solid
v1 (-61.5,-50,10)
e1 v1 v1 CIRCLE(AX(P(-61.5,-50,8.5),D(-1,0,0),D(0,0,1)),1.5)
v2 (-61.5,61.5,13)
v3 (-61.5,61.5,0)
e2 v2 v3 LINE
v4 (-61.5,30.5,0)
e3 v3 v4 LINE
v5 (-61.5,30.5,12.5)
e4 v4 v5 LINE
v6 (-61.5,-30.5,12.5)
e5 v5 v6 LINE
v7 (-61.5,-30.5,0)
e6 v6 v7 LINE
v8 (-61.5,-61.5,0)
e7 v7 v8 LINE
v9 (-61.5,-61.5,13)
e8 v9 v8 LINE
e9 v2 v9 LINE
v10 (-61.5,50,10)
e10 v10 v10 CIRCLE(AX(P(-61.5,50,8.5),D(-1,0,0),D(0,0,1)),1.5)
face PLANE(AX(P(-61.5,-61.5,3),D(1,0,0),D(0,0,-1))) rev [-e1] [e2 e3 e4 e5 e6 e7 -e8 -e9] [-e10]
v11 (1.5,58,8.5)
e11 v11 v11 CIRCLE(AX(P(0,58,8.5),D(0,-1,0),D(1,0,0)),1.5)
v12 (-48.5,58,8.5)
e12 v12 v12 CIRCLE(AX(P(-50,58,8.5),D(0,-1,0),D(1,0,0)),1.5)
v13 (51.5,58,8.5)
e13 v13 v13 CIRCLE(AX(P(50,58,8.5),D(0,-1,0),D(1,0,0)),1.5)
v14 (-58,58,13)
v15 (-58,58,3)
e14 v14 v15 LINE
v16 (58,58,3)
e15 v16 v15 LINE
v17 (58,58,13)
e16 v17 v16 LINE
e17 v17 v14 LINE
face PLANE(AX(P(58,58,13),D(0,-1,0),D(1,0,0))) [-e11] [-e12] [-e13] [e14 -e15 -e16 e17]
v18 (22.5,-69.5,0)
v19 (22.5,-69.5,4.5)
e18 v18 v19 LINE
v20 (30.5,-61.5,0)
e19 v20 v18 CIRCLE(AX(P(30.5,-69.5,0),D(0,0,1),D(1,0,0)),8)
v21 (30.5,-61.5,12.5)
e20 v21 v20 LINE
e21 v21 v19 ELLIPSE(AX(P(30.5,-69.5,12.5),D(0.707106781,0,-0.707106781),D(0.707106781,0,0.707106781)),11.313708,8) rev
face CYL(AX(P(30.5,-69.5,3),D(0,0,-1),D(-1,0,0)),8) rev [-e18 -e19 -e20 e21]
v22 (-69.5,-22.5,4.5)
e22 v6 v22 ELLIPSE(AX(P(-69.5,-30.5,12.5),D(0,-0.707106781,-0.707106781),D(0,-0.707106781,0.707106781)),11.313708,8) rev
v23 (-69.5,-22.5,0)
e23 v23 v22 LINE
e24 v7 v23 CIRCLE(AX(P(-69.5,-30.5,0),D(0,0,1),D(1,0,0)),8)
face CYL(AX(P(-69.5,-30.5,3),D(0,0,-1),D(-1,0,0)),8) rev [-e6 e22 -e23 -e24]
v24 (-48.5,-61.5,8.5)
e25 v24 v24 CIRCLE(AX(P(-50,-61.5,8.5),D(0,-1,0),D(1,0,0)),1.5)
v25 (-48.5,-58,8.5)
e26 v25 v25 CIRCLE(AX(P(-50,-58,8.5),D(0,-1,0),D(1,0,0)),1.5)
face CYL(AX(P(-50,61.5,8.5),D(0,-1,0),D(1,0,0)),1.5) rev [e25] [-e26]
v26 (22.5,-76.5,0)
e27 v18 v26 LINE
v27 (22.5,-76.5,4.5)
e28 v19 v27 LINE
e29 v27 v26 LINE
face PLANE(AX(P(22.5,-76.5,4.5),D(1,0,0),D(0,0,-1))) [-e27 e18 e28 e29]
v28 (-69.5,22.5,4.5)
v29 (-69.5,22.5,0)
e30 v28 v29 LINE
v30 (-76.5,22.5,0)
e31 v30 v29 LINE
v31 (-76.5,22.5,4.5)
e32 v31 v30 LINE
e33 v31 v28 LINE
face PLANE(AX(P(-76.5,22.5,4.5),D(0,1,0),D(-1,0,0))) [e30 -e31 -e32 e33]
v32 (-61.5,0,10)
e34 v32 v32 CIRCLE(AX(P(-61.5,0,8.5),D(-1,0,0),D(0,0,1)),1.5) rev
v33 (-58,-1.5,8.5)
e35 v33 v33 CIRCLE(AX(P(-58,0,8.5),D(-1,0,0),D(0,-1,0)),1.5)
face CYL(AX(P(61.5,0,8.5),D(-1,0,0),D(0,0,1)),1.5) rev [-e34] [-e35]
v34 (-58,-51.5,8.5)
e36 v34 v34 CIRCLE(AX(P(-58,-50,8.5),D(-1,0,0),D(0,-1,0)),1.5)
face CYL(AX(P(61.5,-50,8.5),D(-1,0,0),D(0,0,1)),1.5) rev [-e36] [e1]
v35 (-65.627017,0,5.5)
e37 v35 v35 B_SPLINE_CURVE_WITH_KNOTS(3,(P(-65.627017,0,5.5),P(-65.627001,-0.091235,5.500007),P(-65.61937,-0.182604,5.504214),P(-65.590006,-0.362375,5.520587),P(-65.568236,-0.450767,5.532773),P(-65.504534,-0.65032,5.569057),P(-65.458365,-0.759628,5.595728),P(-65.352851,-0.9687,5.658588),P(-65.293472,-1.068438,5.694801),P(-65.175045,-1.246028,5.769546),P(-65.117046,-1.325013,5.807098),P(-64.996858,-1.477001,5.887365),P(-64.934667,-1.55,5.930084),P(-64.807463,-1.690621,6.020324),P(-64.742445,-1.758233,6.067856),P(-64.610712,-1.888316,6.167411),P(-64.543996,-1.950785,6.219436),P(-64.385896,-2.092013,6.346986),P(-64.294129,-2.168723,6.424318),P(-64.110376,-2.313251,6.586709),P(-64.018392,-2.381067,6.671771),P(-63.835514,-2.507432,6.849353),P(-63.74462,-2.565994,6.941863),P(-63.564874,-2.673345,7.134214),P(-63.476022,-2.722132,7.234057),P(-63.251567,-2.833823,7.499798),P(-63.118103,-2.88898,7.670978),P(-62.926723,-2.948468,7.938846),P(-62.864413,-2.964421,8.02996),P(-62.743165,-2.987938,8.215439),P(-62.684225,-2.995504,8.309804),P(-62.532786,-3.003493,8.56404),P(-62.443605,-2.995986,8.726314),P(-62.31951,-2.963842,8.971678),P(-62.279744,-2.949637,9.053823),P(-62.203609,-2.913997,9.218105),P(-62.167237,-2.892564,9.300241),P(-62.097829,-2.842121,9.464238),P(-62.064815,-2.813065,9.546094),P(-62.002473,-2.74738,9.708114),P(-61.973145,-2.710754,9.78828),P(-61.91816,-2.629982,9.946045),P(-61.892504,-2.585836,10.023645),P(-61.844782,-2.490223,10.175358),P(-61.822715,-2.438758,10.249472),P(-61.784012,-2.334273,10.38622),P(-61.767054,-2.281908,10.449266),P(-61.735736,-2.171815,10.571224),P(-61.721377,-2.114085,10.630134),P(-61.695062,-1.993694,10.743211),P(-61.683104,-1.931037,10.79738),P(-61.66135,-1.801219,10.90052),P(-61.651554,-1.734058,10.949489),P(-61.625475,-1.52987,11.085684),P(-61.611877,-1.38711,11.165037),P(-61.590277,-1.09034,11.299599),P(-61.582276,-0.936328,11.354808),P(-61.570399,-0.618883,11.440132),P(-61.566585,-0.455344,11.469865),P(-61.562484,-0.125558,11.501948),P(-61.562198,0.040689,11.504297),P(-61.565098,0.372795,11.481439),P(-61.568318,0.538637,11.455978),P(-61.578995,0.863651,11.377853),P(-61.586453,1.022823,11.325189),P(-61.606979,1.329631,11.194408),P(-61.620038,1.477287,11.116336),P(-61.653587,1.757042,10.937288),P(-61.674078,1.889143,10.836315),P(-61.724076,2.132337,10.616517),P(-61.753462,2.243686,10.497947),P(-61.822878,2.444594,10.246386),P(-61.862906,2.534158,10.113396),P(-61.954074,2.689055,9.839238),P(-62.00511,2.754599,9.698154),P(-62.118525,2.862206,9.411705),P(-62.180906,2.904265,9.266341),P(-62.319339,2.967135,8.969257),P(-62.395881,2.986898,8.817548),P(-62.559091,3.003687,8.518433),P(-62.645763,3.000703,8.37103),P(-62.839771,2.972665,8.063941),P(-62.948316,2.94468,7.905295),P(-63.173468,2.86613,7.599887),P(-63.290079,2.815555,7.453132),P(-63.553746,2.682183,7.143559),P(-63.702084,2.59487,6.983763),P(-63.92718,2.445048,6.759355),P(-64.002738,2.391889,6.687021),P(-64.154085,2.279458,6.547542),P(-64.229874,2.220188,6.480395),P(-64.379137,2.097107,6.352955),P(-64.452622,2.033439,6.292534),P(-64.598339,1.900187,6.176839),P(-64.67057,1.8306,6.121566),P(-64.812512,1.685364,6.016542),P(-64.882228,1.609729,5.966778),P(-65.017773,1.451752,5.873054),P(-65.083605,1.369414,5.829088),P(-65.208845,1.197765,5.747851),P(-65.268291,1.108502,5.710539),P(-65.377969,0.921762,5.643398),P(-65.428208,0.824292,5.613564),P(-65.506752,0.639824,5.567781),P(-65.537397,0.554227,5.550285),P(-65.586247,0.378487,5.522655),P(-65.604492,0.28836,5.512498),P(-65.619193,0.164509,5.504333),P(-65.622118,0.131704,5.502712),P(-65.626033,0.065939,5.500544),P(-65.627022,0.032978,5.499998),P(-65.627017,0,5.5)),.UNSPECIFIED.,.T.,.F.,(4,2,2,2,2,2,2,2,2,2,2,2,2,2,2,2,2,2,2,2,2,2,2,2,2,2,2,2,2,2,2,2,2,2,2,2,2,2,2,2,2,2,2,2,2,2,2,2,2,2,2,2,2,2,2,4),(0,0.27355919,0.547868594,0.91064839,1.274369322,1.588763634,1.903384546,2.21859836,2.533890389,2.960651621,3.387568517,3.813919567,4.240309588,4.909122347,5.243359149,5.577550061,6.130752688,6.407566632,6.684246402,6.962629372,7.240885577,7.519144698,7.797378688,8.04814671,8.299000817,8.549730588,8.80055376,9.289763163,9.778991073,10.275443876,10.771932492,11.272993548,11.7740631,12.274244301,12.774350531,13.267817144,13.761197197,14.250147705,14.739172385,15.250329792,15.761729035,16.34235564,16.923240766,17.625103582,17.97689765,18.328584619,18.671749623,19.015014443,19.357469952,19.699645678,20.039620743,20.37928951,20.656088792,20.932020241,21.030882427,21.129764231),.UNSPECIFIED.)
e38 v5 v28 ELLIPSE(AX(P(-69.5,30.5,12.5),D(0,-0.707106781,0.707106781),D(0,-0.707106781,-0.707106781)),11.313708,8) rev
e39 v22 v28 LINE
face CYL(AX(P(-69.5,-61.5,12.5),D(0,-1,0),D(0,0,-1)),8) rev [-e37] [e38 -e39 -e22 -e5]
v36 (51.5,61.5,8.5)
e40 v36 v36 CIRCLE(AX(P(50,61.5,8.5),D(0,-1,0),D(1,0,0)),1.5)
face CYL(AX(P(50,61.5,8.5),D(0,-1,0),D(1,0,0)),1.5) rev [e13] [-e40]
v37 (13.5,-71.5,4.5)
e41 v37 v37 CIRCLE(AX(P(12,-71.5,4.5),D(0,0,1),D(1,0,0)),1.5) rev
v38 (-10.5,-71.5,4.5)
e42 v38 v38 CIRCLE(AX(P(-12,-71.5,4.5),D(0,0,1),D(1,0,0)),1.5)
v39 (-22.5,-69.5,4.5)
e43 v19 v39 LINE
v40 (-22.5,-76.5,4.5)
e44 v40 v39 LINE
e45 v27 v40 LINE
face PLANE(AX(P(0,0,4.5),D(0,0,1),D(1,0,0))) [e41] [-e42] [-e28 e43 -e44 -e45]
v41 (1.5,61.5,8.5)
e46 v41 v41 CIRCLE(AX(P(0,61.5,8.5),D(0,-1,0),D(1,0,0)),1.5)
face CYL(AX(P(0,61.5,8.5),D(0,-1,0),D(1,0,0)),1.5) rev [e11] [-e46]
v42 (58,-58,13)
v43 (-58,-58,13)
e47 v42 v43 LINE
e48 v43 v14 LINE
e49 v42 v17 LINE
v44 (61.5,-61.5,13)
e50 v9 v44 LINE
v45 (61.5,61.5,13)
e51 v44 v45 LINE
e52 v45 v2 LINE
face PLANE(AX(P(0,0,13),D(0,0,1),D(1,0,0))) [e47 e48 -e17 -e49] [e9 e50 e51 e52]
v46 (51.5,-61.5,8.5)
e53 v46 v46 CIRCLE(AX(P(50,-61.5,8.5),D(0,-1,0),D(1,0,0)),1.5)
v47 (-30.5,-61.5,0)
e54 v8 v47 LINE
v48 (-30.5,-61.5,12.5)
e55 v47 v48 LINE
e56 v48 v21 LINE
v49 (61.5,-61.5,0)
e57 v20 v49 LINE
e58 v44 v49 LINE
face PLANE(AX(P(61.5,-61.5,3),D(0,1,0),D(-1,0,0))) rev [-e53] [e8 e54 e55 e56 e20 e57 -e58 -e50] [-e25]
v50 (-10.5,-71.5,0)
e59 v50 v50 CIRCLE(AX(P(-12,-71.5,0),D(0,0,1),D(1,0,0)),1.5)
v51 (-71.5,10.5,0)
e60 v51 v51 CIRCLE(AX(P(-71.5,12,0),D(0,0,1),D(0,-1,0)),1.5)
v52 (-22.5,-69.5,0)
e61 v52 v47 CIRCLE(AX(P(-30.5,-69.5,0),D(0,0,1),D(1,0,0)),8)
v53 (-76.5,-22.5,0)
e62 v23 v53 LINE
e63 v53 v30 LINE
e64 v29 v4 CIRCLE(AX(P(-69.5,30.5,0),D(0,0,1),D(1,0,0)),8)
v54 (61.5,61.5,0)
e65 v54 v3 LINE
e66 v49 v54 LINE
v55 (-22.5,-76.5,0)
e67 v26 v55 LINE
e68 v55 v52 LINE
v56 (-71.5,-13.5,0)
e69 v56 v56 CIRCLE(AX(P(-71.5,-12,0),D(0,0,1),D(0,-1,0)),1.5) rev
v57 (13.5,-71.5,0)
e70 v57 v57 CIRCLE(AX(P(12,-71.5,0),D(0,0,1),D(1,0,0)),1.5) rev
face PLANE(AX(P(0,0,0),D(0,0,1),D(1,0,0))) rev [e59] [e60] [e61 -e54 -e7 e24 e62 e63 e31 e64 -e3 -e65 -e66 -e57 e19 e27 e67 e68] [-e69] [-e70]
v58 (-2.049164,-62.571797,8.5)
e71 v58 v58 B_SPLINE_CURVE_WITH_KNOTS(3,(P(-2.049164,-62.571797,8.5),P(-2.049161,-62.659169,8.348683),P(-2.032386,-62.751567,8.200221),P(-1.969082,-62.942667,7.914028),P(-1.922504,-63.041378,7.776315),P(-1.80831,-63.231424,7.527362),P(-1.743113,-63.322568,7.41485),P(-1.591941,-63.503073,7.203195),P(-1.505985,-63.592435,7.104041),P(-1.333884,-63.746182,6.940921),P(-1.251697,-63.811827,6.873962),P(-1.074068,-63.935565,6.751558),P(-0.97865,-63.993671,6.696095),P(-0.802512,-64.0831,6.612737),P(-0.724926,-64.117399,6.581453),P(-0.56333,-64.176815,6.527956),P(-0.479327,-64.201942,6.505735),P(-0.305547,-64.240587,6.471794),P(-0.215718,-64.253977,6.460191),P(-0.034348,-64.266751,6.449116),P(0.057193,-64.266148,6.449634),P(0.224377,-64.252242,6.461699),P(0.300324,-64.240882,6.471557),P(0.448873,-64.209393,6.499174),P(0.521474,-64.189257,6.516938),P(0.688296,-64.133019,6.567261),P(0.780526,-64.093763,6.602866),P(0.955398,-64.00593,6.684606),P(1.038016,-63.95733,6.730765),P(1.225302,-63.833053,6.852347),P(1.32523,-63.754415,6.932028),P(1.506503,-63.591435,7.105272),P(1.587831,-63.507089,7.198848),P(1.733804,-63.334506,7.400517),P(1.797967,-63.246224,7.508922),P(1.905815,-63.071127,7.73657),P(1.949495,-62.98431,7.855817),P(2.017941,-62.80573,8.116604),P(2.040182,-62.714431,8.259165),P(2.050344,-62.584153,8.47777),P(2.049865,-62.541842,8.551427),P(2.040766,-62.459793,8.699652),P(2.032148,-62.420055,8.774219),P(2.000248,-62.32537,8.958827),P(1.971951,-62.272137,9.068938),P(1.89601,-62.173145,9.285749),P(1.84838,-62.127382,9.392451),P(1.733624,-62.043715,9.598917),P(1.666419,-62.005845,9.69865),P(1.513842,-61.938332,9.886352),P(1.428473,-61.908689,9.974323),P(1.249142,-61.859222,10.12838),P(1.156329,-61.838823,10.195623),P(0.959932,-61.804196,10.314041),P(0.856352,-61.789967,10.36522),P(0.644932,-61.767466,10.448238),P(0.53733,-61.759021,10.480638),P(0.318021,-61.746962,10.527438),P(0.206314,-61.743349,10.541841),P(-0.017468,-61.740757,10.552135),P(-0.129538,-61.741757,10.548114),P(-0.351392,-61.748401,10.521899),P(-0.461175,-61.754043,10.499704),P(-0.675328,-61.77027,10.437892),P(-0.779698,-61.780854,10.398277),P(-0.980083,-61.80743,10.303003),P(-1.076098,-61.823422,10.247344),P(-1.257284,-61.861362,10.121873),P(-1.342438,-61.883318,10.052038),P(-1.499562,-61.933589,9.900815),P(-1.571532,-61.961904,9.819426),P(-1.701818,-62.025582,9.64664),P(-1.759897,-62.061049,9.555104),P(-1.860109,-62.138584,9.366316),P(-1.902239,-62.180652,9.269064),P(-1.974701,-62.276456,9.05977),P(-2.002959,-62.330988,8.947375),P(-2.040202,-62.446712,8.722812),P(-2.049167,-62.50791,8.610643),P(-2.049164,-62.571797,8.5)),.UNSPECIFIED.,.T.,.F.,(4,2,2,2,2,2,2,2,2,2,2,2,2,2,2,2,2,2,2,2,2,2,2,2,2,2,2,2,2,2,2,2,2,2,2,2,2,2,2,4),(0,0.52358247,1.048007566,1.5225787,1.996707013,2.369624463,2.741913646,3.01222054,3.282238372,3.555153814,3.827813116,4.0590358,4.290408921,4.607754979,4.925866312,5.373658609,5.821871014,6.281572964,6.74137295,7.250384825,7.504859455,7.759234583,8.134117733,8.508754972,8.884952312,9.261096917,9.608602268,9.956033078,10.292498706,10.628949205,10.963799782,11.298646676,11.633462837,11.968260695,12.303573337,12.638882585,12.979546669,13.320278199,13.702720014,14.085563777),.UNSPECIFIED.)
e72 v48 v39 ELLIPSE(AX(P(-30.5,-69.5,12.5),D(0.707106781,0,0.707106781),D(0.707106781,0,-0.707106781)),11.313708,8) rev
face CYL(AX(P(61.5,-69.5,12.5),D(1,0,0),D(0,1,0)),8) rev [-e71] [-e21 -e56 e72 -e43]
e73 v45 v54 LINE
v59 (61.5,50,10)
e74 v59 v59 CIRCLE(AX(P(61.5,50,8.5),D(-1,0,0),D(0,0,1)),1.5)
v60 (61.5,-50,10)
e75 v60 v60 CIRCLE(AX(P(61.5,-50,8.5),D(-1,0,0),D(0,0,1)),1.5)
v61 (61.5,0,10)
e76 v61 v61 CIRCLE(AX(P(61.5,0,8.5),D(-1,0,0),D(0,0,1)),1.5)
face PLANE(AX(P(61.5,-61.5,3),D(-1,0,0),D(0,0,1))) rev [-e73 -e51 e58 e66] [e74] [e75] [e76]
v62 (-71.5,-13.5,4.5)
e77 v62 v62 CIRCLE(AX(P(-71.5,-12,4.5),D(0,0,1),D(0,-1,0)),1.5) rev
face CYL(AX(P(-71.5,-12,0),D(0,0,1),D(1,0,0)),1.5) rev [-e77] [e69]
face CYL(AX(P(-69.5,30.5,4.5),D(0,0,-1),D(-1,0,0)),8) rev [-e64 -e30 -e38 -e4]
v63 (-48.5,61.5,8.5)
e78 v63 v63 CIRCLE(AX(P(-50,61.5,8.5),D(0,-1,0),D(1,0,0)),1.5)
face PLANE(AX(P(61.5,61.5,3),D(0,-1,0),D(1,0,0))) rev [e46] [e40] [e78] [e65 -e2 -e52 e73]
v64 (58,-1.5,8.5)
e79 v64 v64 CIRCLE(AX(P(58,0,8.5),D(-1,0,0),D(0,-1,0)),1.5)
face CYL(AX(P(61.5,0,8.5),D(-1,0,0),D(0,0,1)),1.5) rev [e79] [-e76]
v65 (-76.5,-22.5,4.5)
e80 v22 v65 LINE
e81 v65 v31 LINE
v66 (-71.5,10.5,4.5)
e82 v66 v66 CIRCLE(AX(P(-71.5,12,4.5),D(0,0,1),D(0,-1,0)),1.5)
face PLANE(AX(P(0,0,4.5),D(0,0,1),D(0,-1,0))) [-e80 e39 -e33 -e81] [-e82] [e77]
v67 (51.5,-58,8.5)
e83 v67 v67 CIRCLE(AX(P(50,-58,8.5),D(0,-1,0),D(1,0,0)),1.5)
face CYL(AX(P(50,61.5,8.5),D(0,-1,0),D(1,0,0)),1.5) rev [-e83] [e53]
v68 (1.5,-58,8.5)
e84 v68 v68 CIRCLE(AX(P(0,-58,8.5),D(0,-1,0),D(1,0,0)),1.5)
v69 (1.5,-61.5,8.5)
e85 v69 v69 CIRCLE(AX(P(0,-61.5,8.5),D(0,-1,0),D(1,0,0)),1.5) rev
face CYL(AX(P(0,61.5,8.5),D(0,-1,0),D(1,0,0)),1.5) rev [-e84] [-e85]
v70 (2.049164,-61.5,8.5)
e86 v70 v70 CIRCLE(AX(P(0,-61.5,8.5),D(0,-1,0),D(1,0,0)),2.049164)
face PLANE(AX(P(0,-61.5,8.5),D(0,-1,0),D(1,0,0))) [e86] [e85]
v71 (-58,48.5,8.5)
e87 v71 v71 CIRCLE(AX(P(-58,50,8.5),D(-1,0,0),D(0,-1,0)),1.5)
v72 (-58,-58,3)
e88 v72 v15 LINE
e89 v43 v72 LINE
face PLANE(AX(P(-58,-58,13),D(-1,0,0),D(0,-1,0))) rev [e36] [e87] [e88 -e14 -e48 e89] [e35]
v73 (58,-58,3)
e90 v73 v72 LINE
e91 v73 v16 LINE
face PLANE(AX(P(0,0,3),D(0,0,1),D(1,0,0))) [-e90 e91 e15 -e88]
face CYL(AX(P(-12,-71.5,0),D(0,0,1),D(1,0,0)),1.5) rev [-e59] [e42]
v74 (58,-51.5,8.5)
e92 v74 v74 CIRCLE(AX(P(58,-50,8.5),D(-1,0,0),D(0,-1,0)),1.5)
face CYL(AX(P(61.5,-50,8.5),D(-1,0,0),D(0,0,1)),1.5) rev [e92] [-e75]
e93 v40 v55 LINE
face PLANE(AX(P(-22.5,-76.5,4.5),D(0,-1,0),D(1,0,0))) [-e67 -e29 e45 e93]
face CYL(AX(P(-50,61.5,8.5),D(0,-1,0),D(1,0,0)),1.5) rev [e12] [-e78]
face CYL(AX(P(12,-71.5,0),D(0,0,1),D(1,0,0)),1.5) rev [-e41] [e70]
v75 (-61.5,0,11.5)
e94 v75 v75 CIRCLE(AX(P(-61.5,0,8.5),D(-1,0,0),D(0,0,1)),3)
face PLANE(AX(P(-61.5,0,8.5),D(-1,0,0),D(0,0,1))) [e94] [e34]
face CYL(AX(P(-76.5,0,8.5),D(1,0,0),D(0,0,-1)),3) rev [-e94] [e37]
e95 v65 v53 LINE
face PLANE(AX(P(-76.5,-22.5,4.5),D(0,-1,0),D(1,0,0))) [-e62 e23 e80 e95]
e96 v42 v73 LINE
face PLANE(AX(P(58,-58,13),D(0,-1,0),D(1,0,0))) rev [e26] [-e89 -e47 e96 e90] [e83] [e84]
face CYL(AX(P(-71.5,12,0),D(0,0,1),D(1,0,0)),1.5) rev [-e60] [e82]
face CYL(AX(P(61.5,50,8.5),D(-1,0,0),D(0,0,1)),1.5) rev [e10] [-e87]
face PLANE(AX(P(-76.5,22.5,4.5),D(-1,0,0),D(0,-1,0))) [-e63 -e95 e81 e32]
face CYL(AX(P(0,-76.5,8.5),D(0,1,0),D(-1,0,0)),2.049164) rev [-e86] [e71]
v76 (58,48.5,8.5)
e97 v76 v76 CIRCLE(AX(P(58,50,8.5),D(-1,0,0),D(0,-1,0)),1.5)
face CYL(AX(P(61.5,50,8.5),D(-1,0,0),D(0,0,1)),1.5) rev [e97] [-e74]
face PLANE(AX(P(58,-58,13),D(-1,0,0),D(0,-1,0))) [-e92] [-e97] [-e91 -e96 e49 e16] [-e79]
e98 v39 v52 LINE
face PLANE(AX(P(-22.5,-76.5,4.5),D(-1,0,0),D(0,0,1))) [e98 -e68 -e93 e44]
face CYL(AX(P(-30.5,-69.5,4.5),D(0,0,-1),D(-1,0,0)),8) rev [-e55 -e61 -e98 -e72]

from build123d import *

# Parameters (mm, degrees)
SKETCH_3_W               = 123
SKETCH_3_H               = 123
EXTRUDE_2_DEPTH          = 3
SKETCH_4_W               = 123
SKETCH_4_H               = 123
SKETCH_4_W_2             = 116
SKETCH_4_H_2             = 116
EXTRUDE_3_DEPTH          = 10
SKETCH_7_R               = 1.5
CUT_EXTRUDE_1_DEPTH      = 139.131278138
SKETCH_9_R               = 1.5
CUT_EXTRUDE_2_DEPTH      = 139.131278138
SKETCH_10_W              = 45
SKETCH_10_H              = 15
EXTRUDE_4_DEPTH          = 4.5
SKETCH_11_R              = 1.5
CUT_EXTRUDE_3_DEPTH      = 99.522839992
PATTERN_CIRCULAR_1_COUNT = 2
PATTERN_CIRCULAR_1_ANGLE = 90
FILLET_1_R               = 8
SKETCH_13_R              = 3
CUT_EXTRUDE_4_DEPTH      = 146.431255238
SKETCH_14_R              = 2.049164466
CUT_EXTRUDE_6_DEPTH      = 146.431255238


with BuildPart() as part:
    # 草图3 → 凸台-拉伸2 (new body)
    with BuildSketch(Plane.XY):
        Rectangle(SKETCH_3_W, SKETCH_3_H)
    extrude(amount=EXTRUDE_2_DEPTH)

    # 草图4 → 凸台-拉伸3 (add)
    with BuildSketch(Plane.XY.offset(3)):
        Rectangle(SKETCH_4_W, SKETCH_4_H)
        Rectangle(SKETCH_4_W_2, SKETCH_4_H_2, mode=Mode.SUBTRACT)
    extrude(amount=EXTRUDE_3_DEPTH)

    # 草图7 → 切除-拉伸1 (cut, through all)
    with BuildSketch(Plane.XZ.offset(61.5)):
        with Locations((0, 8.5)):
            Circle(SKETCH_7_R)
        with Locations((50, 8.5)):
            Circle(SKETCH_7_R)
        with Locations((-50, 8.5)):
            Circle(SKETCH_7_R)
    extrude(amount=-CUT_EXTRUDE_1_DEPTH, mode=Mode.SUBTRACT)

    # 草图9 → 切除-拉伸2 (cut, through all)
    with BuildSketch(Plane.ZY.offset(61.5)):
        with Locations((8.5, 0)):
            Circle(SKETCH_9_R)
        with Locations((8.5, -50)):
            Circle(SKETCH_9_R)
        with Locations((8.5, 50)):
            Circle(SKETCH_9_R)
    extrude(amount=-CUT_EXTRUDE_2_DEPTH, mode=Mode.SUBTRACT)

    # 草图10 → 凸台-拉伸4 (add)
    with BuildSketch(Plane(origin=(0, 0, 0), x_dir=(-1, 0, 0), z_dir=(0, 0, -1))):
        with Locations((0, -69)):
            Rectangle(SKETCH_10_W, SKETCH_10_H)
    extrude_4 = extrude(amount=-EXTRUDE_4_DEPTH)

    # 草图11 → 切除-拉伸3 (cut, through all)
    with BuildSketch(Plane.XY.offset(4.5)):
        with Locations((-12, -71.5)):
            Circle(SKETCH_11_R)
        with Locations((12, -71.5)):
            Circle(SKETCH_11_R)
    cut_extrude_3 = extrude(amount=-CUT_EXTRUDE_3_DEPTH, mode=Mode.SUBTRACT)

    # 阵列(圆周)1: 凸台-拉伸4, 切除-拉伸3 ×2 about axis
    pattern_circular_1_axis = Axis((0, 0, 0), (0, 0, -1))
    add([extrude_4.rotate(pattern_circular_1_axis, i * PATTERN_CIRCULAR_1_ANGLE / (PATTERN_CIRCULAR_1_COUNT - 1)) for i in range(1, PATTERN_CIRCULAR_1_COUNT)])
    add([cut_extrude_3.rotate(pattern_circular_1_axis, i * PATTERN_CIRCULAR_1_ANGLE / (PATTERN_CIRCULAR_1_COUNT - 1)) for i in range(1, PATTERN_CIRCULAR_1_COUNT)], mode=Mode.SUBTRACT)

    # 圆角1
    # the kernel refuses this fillet: 8 mm, written as the material it adds along each edge
    with BuildSketch(Plane(origin=(-61.5, 22.5, 0), x_dir=(0, 1, 0), z_dir=(0, 0, 1)), Plane(origin=(-22.5, -61.5, 0), x_dir=(-1, 0, 0), z_dir=(0, 0, 1))) as fillet_1_piece_1:
        with BuildLine():
            CenterArc((FILLET_1_R, FILLET_1_R), FILLET_1_R, 180, 90)
            Line((0, FILLET_1_R), (0, 0))
            Line((0, 0), (FILLET_1_R, 0))
        make_face()
    extrude(amount=4.5)
    with BuildSketch(Plane(origin=(-61.5, -22.5, 4.5), x_dir=(0, 0, 1), z_dir=(0, 1, 0))) as fillet_1_piece_2_section:
        with BuildLine():
            CenterArc((FILLET_1_R, -FILLET_1_R), FILLET_1_R, 90, 90)
            Line((0, -FILLET_1_R), (0, 0))
            Line((0, 0), (FILLET_1_R, 0))
        make_face()
    fillet_1_piece_2 = extrude(amount=45, mode=Mode.PRIVATE)
    fillet_1_piece_2 = fillet_1_piece_2 - Plane(origin=(-63.326853287, 0, 8.5), x_dir=(0, 0, 1), z_dir=(-1, 0, 0)) * Cylinder(1.5, 122, mode=Mode.PRIVATE)
    add(fillet_1_piece_2)
    with BuildSketch(Plane(origin=(-61.5, -22.5, 0), x_dir=(0, -1, 0), z_dir=(0, 0, 1)), Plane(origin=(22.5, -61.5, 0), x_dir=(1, 0, 0), z_dir=(0, 0, 1))) as fillet_1_piece_3:
        with BuildLine():
            CenterArc((FILLET_1_R, -FILLET_1_R), FILLET_1_R, 90, 90)
            Line((0, -FILLET_1_R), (0, 0))
            Line((0, 0), (FILLET_1_R, 0))
        make_face()
    extrude(amount=4.5)
    with BuildSketch(Plane(origin=(22.5, -61.5, 4.5), x_dir=(0, 0, 1), z_dir=(-1, 0, 0))) as fillet_1_piece_4_section:
        with BuildLine():
            CenterArc((FILLET_1_R, -FILLET_1_R), FILLET_1_R, 90, 90)
            Line((0, -FILLET_1_R), (0, 0))
            Line((0, 0), (FILLET_1_R, 0))
        make_face()
    fillet_1_piece_4 = extrude(amount=45, mode=Mode.PRIVATE)
    fillet_1_piece_4 = fillet_1_piece_4 - Plane(origin=(0, -63.326852549, 8.5), x_dir=(1, 0, 0), z_dir=(0, -1, 0)) * Cylinder(1.5, 122, mode=Mode.PRIVATE)
    add(fillet_1_piece_4)
    with BuildSketch(Plane(origin=(-61.5, -22.5, 4.5), x_dir=(0, 0, 1), z_dir=(0, 1, 0))) as fillet_1_piece_5a_section:
        with BuildLine():
            CenterArc((FILLET_1_R, -FILLET_1_R), FILLET_1_R, 90, 90)
            Line((0, -FILLET_1_R), (0, 0))
            Line((0, 0), (FILLET_1_R, 0))
        make_face()
    fillet_1_piece_5a = extrude(amount=65, mode=Mode.PRIVATE)
    fillet_1_piece_5a = split(fillet_1_piece_5a, bisect_by=Plane(origin=(-63.311160914, 22.5, 6.311160914), z_dir=(0, 1, 0)), keep=Keep.TOP, mode=Mode.PRIVATE)
    with BuildSketch(Plane(origin=(-61.5, 22.5, 0), x_dir=(0, 1, 0), z_dir=(0, 0, 1))) as fillet_1_piece_5b_section:
        with BuildLine():
            CenterArc((FILLET_1_R, FILLET_1_R), FILLET_1_R, 180, 90)
            Line((0, FILLET_1_R), (0, 0))
            Line((0, 0), (FILLET_1_R, 0))
        make_face()
    fillet_1_piece_5b = extrude(amount=24.5, mode=Mode.PRIVATE)
    fillet_1_piece_5b = split(fillet_1_piece_5b, bisect_by=Plane(origin=(-63.311160914, 24.311160914, 13), z_dir=(0, 0, -1)), keep=Keep.TOP, mode=Mode.PRIVATE)
    fillet_1_piece_5b = split(fillet_1_piece_5b, bisect_by=Plane(origin=(-63.311160914, 24.311160914, 4.5), z_dir=(0, 0, 1)), keep=Keep.TOP, mode=Mode.PRIVATE)
    fillet_1_piece_5 = fillet_1_piece_5a & fillet_1_piece_5b
    add(fillet_1_piece_5)
    with BuildSketch(Plane(origin=(-61.5, -22.5, 0), x_dir=(0, -1, 0), z_dir=(0, 0, 1))) as fillet_1_piece_6a_section:
        with BuildLine():
            CenterArc((FILLET_1_R, -FILLET_1_R), FILLET_1_R, 90, 90)
            Line((0, -FILLET_1_R), (0, 0))
            Line((0, 0), (FILLET_1_R, 0))
        make_face()
    fillet_1_piece_6a = extrude(amount=24.5, mode=Mode.PRIVATE)
    fillet_1_piece_6a = split(fillet_1_piece_6a, bisect_by=Plane(origin=(-63.311160914, -24.311160914, 13), z_dir=(0, 0, -1)), keep=Keep.TOP, mode=Mode.PRIVATE)
    fillet_1_piece_6a = split(fillet_1_piece_6a, bisect_by=Plane(origin=(-63.311160914, -24.311160914, 4.5), z_dir=(0, 0, 1)), keep=Keep.TOP, mode=Mode.PRIVATE)
    with BuildSketch(Plane(origin=(-61.5, -42.5, 4.5), x_dir=(0, 0, 1), z_dir=(0, 1, 0))) as fillet_1_piece_6b_section:
        with BuildLine():
            CenterArc((FILLET_1_R, -FILLET_1_R), FILLET_1_R, 90, 90)
            Line((0, -FILLET_1_R), (0, 0))
            Line((0, 0), (FILLET_1_R, 0))
        make_face()
    fillet_1_piece_6b = extrude(amount=65, mode=Mode.PRIVATE)
    fillet_1_piece_6b = split(fillet_1_piece_6b, bisect_by=Plane(origin=(-63.311160914, -22.5, 6.311160914), z_dir=(0, -1, 0)), keep=Keep.TOP, mode=Mode.PRIVATE)
    fillet_1_piece_6 = fillet_1_piece_6a & fillet_1_piece_6b
    add(fillet_1_piece_6)
    with BuildSketch(Plane(origin=(22.5, -61.5, 4.5), x_dir=(0, 0, 1), z_dir=(-1, 0, 0))) as fillet_1_piece_7a_section:
        with BuildLine():
            CenterArc((FILLET_1_R, -FILLET_1_R), FILLET_1_R, 90, 90)
            Line((0, -FILLET_1_R), (0, 0))
            Line((0, 0), (FILLET_1_R, 0))
        make_face()
    fillet_1_piece_7a = extrude(amount=65, mode=Mode.PRIVATE)
    fillet_1_piece_7a = split(fillet_1_piece_7a, bisect_by=Plane(origin=(-22.5, -63.311160914, 6.311160914), z_dir=(-1, 0, 0)), keep=Keep.TOP, mode=Mode.PRIVATE)
    with BuildSketch(Plane(origin=(-22.5, -61.5, 0), x_dir=(-1, 0, 0), z_dir=(0, 0, 1))) as fillet_1_piece_7b_section:
        with BuildLine():
            CenterArc((FILLET_1_R, FILLET_1_R), FILLET_1_R, 180, 90)
            Line((0, FILLET_1_R), (0, 0))
            Line((0, 0), (FILLET_1_R, 0))
        make_face()
    fillet_1_piece_7b = extrude(amount=24.5, mode=Mode.PRIVATE)
    fillet_1_piece_7b = split(fillet_1_piece_7b, bisect_by=Plane(origin=(-24.311160914, -63.311160914, 13), z_dir=(0, 0, -1)), keep=Keep.TOP, mode=Mode.PRIVATE)
    fillet_1_piece_7b = split(fillet_1_piece_7b, bisect_by=Plane(origin=(-24.311160914, -63.311160914, 4.5), z_dir=(0, 0, 1)), keep=Keep.TOP, mode=Mode.PRIVATE)
    fillet_1_piece_7 = fillet_1_piece_7a & fillet_1_piece_7b
    add(fillet_1_piece_7)
    with BuildSketch(Plane(origin=(22.5, -61.5, 0), x_dir=(1, 0, 0), z_dir=(0, 0, 1))) as fillet_1_piece_8a_section:
        with BuildLine():
            CenterArc((FILLET_1_R, -FILLET_1_R), FILLET_1_R, 90, 90)
            Line((0, -FILLET_1_R), (0, 0))
            Line((0, 0), (FILLET_1_R, 0))
        make_face()
    fillet_1_piece_8a = extrude(amount=24.5, mode=Mode.PRIVATE)
    fillet_1_piece_8a = split(fillet_1_piece_8a, bisect_by=Plane(origin=(24.311160914, -63.311160914, 13), z_dir=(0, 0, -1)), keep=Keep.TOP, mode=Mode.PRIVATE)
    fillet_1_piece_8a = split(fillet_1_piece_8a, bisect_by=Plane(origin=(24.311160914, -63.311160914, 4.5), z_dir=(0, 0, 1)), keep=Keep.TOP, mode=Mode.PRIVATE)
    with BuildSketch(Plane(origin=(42.5, -61.5, 4.5), x_dir=(0, 0, 1), z_dir=(-1, 0, 0))) as fillet_1_piece_8b_section:
        with BuildLine():
            CenterArc((FILLET_1_R, -FILLET_1_R), FILLET_1_R, 90, 90)
            Line((0, -FILLET_1_R), (0, 0))
            Line((0, 0), (FILLET_1_R, 0))
        make_face()
    fillet_1_piece_8b = extrude(amount=65, mode=Mode.PRIVATE)
    fillet_1_piece_8b = split(fillet_1_piece_8b, bisect_by=Plane(origin=(22.5, -63.311160914, 6.311160914), z_dir=(1, 0, 0)), keep=Keep.TOP, mode=Mode.PRIVATE)
    fillet_1_piece_8 = fillet_1_piece_8a & fillet_1_piece_8b
    add(fillet_1_piece_8)

    # 草图13 → 切除-拉伸4 (cut, through all)
    with BuildSketch(Plane.ZY.offset(61.5)):
        with Locations(Location((8.5, 0, 0), (0, 0, 180))):
            Circle(SKETCH_13_R)
    extrude(amount=CUT_EXTRUDE_4_DEPTH, mode=Mode.SUBTRACT)

    # 草图14 → 切除-拉伸6 (cut, through all)
    with BuildSketch(Plane.XZ.offset(61.5)):
        with Locations(Location((0, 8.5, 0), (0, 0, 180))):
            Circle(SKETCH_14_R)
    extrude(amount=CUT_EXTRUDE_6_DEPTH, mode=Mode.SUBTRACT)


solid = part.part
